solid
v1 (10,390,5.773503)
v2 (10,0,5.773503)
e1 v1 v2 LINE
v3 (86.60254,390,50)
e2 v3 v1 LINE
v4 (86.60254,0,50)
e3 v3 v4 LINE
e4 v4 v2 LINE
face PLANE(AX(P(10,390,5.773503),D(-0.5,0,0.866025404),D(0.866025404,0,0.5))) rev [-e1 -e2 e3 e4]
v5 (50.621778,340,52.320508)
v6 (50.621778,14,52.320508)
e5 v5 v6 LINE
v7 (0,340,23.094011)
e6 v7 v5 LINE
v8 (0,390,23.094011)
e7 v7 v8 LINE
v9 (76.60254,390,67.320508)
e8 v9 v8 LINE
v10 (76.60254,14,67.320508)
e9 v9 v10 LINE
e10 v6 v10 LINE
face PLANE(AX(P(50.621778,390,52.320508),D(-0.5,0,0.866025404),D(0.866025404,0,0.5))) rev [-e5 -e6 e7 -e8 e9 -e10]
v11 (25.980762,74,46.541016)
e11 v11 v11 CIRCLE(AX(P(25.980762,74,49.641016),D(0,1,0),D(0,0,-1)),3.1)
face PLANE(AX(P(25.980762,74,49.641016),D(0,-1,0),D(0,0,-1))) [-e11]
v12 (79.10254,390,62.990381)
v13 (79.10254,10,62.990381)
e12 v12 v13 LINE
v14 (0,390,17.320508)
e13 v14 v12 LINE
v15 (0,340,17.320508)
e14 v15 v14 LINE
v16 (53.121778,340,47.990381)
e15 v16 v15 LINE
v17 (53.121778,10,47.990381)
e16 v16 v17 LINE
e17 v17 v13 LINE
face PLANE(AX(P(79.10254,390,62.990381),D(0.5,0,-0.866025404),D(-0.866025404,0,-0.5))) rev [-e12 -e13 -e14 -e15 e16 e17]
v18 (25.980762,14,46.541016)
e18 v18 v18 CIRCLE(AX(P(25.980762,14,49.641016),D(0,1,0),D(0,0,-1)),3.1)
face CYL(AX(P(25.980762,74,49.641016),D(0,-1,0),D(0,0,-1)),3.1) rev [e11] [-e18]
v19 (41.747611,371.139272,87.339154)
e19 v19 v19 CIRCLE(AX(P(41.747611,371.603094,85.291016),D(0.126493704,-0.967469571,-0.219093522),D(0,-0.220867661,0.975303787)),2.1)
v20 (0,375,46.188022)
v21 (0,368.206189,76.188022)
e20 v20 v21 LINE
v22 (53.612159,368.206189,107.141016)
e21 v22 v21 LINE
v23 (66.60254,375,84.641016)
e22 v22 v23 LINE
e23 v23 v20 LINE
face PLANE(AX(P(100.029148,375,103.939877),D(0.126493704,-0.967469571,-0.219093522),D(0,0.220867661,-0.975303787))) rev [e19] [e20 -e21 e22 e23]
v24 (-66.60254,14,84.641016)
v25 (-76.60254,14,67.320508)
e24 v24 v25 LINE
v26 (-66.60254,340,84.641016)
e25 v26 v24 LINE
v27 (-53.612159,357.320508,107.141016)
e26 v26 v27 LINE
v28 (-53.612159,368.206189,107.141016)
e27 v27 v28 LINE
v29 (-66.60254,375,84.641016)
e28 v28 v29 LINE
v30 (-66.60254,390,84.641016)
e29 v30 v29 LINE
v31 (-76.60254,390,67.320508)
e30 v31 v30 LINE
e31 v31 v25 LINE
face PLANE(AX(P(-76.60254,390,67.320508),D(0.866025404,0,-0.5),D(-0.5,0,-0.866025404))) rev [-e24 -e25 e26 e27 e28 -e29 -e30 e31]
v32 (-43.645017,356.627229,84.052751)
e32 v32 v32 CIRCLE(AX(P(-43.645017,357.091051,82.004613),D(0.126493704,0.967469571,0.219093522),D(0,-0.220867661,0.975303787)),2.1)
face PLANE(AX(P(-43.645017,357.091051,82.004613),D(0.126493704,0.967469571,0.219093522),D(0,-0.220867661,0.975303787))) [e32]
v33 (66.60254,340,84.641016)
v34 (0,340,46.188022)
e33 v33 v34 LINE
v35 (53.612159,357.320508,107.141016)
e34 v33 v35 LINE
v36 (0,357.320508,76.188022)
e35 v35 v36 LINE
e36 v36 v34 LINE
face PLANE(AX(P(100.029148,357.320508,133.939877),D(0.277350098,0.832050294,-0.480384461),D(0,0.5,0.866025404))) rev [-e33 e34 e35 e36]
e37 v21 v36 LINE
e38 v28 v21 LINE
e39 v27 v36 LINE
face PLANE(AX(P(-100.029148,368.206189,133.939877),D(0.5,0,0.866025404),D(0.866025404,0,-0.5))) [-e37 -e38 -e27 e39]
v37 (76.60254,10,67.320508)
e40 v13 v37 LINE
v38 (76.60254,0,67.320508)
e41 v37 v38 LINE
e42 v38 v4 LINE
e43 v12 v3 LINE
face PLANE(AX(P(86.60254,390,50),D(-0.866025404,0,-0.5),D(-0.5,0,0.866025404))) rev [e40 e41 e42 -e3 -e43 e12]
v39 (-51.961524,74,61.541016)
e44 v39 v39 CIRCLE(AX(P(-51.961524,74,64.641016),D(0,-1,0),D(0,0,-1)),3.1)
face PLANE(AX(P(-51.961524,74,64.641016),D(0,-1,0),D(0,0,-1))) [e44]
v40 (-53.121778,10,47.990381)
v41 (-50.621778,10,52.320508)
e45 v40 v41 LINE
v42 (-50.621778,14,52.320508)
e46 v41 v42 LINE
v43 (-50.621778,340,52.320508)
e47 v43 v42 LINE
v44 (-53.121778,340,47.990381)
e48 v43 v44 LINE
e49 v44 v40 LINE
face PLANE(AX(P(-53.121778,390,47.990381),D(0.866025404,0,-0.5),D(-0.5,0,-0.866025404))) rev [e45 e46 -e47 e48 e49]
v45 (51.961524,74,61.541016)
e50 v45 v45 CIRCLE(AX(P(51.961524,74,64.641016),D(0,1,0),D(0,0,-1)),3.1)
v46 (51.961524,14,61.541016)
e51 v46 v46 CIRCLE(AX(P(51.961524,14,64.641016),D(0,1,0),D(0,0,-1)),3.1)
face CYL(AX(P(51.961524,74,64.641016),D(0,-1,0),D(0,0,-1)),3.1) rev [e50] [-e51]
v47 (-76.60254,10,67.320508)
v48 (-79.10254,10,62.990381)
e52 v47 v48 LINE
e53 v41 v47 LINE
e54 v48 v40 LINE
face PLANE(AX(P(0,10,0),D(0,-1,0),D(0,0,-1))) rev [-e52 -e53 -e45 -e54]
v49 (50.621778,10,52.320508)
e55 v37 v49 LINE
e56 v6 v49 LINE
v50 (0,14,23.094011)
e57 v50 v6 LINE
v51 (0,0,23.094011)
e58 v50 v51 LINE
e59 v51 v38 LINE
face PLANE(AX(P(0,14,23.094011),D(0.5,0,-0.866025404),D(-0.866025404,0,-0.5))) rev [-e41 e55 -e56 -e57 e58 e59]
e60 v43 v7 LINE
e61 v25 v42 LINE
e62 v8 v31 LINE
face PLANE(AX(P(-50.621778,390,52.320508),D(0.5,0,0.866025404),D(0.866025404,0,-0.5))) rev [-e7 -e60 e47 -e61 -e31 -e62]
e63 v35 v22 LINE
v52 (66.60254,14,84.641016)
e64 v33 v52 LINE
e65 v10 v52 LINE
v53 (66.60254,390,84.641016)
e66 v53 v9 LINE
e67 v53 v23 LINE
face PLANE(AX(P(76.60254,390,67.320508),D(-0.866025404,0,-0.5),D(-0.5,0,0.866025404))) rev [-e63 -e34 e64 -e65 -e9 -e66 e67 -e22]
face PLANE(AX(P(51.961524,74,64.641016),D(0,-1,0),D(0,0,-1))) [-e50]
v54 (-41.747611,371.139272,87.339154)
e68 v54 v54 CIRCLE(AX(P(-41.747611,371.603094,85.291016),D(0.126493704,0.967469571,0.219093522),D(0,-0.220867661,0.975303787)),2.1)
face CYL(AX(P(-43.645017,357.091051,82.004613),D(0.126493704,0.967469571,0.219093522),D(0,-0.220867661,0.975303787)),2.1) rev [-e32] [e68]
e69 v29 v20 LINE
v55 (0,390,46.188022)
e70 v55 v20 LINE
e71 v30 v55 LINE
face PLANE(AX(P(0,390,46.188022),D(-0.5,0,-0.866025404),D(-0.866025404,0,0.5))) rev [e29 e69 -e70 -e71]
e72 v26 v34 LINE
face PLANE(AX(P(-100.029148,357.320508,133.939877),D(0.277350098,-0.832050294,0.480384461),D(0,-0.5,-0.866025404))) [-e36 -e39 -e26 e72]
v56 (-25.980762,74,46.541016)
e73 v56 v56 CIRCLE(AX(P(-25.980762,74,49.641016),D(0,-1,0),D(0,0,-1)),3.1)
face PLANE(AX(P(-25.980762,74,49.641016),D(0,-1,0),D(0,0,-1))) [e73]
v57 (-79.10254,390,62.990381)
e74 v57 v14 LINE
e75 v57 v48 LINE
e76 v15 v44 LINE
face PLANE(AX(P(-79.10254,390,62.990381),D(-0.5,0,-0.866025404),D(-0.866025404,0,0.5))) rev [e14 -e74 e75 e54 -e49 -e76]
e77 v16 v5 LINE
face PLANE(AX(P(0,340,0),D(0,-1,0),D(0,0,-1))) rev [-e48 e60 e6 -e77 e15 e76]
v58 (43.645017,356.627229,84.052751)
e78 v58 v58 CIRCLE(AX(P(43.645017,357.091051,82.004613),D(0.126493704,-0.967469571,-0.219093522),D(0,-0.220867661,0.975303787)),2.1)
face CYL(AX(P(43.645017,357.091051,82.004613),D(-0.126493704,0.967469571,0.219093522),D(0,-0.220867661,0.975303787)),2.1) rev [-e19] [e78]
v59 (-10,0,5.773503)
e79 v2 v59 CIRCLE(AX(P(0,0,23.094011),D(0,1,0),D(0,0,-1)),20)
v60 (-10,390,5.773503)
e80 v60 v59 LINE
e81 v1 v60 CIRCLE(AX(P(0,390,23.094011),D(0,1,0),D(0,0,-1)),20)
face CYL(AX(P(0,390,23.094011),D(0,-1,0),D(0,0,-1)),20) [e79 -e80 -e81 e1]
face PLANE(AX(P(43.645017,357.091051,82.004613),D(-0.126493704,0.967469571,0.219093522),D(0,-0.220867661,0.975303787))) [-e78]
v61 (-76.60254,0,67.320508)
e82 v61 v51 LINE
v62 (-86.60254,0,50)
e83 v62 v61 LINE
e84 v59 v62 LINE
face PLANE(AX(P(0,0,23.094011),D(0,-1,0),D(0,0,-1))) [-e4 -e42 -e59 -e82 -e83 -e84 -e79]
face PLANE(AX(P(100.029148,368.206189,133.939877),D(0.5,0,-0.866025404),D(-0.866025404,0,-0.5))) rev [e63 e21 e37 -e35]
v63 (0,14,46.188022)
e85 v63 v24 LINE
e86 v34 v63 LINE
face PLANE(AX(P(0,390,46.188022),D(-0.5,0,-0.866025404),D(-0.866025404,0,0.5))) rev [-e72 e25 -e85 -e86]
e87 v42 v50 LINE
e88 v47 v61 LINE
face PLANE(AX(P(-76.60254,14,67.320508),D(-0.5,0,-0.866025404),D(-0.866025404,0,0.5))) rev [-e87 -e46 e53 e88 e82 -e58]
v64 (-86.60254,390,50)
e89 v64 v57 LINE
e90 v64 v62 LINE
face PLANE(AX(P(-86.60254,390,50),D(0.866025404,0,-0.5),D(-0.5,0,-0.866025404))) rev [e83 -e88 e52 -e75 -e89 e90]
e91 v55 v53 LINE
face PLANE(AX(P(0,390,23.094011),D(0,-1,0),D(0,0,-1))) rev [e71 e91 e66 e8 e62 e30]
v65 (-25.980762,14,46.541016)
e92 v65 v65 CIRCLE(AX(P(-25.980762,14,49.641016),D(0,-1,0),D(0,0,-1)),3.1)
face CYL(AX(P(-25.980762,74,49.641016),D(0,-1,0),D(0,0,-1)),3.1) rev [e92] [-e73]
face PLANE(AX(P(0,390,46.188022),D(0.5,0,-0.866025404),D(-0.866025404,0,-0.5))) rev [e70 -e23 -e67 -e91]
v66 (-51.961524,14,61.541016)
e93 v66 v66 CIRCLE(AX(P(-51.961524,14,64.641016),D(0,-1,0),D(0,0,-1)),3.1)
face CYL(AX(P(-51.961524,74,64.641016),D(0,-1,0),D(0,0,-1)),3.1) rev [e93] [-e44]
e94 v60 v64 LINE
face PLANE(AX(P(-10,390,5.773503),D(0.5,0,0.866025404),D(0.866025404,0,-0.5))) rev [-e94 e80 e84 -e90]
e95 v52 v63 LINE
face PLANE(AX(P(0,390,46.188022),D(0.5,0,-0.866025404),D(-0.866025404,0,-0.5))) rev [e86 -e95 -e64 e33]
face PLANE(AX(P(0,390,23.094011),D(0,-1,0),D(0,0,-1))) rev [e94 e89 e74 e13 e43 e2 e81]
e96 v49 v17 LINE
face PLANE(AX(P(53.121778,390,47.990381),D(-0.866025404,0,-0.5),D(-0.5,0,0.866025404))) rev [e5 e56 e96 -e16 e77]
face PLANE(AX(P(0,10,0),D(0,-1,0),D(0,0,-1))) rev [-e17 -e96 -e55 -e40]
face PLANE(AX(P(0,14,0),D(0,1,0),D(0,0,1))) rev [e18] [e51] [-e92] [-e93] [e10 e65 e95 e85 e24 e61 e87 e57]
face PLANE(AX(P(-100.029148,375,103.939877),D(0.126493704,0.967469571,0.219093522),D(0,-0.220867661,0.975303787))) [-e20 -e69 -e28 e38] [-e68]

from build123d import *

# Parameters (mm, degrees)
BOSS_EXTRUDE1_DEPTH = 390
CUT_EXTRUDE2_DEPTH  = 14
CUT_EXTRUDE3_DEPTH  = 50
BOSS_EXTRUDE2_DEPTH = 10
BOSS_EXTRUDE3_REACH = 473.852
BOSS_EXTRUDE4_REACH = 479.913
SKETCH22_R          = 2.1
CUT_EXTRUDE4_DEPTH  = 15
SKETCH23_R          = 3.1
CUT_EXTRUDE5_DEPTH  = 60


with BuildPart() as part:
    # Sketch1 → Boss-Extrude1 (new body)
    with BuildSketch(Plane(origin=(0, 0, 0), x_dir=(1, 0, 0), z_dir=(0, 1, 0))):
        with BuildLine():
            Line((-10, -5.773502692), (-86.602540378, -50))
            Line((-86.602540378, -50), (-79.102540378, -62.990381057))
            Line((-79.102540378, -62.990381057), (-53.121778265, -47.990381057))
            Line((-53.121778265, -47.990381057), (-50.621778265, -52.320508076))
            Line((-50.621778265, -52.320508076), (-76.602540378, -67.320508076))
            Line((-76.602540378, -67.320508076), (-66.602540378, -84.641016151))
            Line((-66.602540378, -84.641016151), (0, -46.188021535))
            Line((0, -46.188021535), (66.602540378, -84.641016151))
            Line((66.602540378, -84.641016151), (76.602540378, -67.320508076))
            Line((76.602540378, -67.320508076), (50.621778265, -52.320508076))
            Line((50.621778265, -52.320508076), (53.121778265, -47.990381057))
            Line((53.121778265, -47.990381057), (79.102540378, -62.990381057))
            Line((79.102540378, -62.990381057), (86.602540378, -50))
            Line((86.602540378, -50), (10, -5.773502692))
            ThreePointArc((10, -5.773502692), (0, -3.094010768), (-10, -5.773502692))
        make_face()
    extrude(amount=BOSS_EXTRUDE1_DEPTH)

    # Sketch18 → Cut-Extrude2 (cut)
    with BuildSketch(Plane.XZ):
        Polygon((-76.602540378, 67.320508076), (0, 23.094010768), (76.602540378, 67.320508076), (66.602540378, 84.641016151), (0, 46.188021535), (-66.602540378, 84.641016151), align=None)
    extrude(amount=-CUT_EXTRUDE2_DEPTH, mode=Mode.SUBTRACT)

    # Sketch19 → Cut-Extrude3 (cut)
    with BuildSketch(Plane(origin=(0, 390, 0), x_dir=(1, 0, 0), z_dir=(0, 1, 0))):
        Polygon((76.602540378, -67.320508076), (0, -23.094010768), (-76.602540378, -67.320508076), (-79.102540378, -62.990381057), (0, -17.320508076), (79.102540378, -62.990381057), align=None)
    extrude(amount=-CUT_EXTRUDE3_DEPTH, mode=Mode.SUBTRACT)

    # Sketch20 → Boss-Extrude2 (add)
    with BuildSketch(Plane.XZ):
        Polygon((76.602540378, 67.320508076), (50.621778265, 52.320508076), (53.121778265, 47.990381057), (79.102540378, 62.990381057), align=None)
        Polygon((-50.621778265, 52.320508076), (-76.602540378, 67.320508076), (-79.102540378, 62.990381057), (-53.121778265, 47.990381057), align=None)
    extrude(amount=-BOSS_EXTRUDE2_DEPTH)

    # Boss-Extrude3: up to this plane
    boss_extrude3_end = Plane(origin=(-86.602540378, 390, 50), z_dir=(0.8660254037844359, 0, -0.5000000000000048))
    # Sketch21 → Boss-Extrude3 (add, up to the surface)
    with BuildSketch(Plane(origin=(0, 0, 0), x_dir=(0, 0, -1), z_dir=(1, 0, 0)), mode=Mode.PRIVATE) as boss_extrude3_sk1:
        Polygon((-46.188021535, 375), (-76.188021535, 368.206188758), (-76.188021535, 357.320508076), (-46.188021535, 340), align=None)
    boss_extrude3_tool1 = split(extrude(boss_extrude3_sk1.sketch, amount=BOSS_EXTRUDE3_REACH, dir=(-0.866025403784, 0, 0.5), mode=Mode.PRIVATE), bisect_by=boss_extrude3_end, keep=Keep.BOTH, mode=Mode.PRIVATE)
    add(boss_extrude3_tool1.solids().sort_by_distance((0, 359.670666, 58.56037))[0])

    # Boss-Extrude4: up to this plane
    boss_extrude4_end = Plane(origin=(76.602540378, 390, 67.320508076), z_dir=(-0.8660254037844398, 0, -0.49999999999999795))
    # Sketch21<2> → Boss-Extrude4 (add, up to the surface)
    with BuildSketch(Plane(origin=(0, 0, 0), x_dir=(0, 0, -1), z_dir=(1, 0, 0)), mode=Mode.PRIVATE) as boss_extrude4_sk1:
        Polygon((-46.188021535, 375), (-76.188021535, 368.206188758), (-76.188021535, 357.320508076), (-46.188021535, 340), align=None)
    boss_extrude4_tool1 = split(extrude(boss_extrude4_sk1.sketch, amount=BOSS_EXTRUDE4_REACH, dir=(0.866025403784, 0, 0.5), mode=Mode.PRIVATE), bisect_by=boss_extrude4_end, keep=Keep.BOTH, mode=Mode.PRIVATE)
    add(boss_extrude4_tool1.solids().sort_by_distance((0, 359.670666, 58.56037))[0])

    # Sketch22 → Cut-Extrude4 (cut)
    with BuildSketch(Plane(origin=(47.172106066, 360.789319124, 81.704484407), x_dir=(0.9919674102096397, -0.12336978823439819, -0.027938368473838716), z_dir=(0.12649370372465277, 0.9674695714450555, 0.21909352168866233))):
        with Locations((-89.639756751, -1.109544744)):
            Circle(SKETCH22_R)
    cut_extrude4 = extrude(amount=-CUT_EXTRUDE4_DEPTH, mode=Mode.SUBTRACT)

    # Mirror1: Cut-Extrude4 across plane
    add(cut_extrude4.mirror(Plane(origin=(0, 0, 0), x_dir=(0, 0, 1), z_dir=(1, 0, 0))), mode=Mode.SUBTRACT)

    # Sketch23 → Cut-Extrude5 (cut)
    with BuildSketch(Plane.XZ.offset(-14)):
        with Locations((-25.980762114, 49.641016151)):
            Circle(SKETCH23_R)
        with Locations((-51.961524227, 64.641016151)):
            Circle(SKETCH23_R)
    cut_extrude5 = extrude(amount=-CUT_EXTRUDE5_DEPTH, mode=Mode.SUBTRACT)

    # Mirror2: Cut-Extrude5 across plane
    add(cut_extrude5.mirror(Plane(origin=(0, 0, 0), x_dir=(0, 0, 1), z_dir=(1, 0, 0))), mode=Mode.SUBTRACT)


solid = part.part
